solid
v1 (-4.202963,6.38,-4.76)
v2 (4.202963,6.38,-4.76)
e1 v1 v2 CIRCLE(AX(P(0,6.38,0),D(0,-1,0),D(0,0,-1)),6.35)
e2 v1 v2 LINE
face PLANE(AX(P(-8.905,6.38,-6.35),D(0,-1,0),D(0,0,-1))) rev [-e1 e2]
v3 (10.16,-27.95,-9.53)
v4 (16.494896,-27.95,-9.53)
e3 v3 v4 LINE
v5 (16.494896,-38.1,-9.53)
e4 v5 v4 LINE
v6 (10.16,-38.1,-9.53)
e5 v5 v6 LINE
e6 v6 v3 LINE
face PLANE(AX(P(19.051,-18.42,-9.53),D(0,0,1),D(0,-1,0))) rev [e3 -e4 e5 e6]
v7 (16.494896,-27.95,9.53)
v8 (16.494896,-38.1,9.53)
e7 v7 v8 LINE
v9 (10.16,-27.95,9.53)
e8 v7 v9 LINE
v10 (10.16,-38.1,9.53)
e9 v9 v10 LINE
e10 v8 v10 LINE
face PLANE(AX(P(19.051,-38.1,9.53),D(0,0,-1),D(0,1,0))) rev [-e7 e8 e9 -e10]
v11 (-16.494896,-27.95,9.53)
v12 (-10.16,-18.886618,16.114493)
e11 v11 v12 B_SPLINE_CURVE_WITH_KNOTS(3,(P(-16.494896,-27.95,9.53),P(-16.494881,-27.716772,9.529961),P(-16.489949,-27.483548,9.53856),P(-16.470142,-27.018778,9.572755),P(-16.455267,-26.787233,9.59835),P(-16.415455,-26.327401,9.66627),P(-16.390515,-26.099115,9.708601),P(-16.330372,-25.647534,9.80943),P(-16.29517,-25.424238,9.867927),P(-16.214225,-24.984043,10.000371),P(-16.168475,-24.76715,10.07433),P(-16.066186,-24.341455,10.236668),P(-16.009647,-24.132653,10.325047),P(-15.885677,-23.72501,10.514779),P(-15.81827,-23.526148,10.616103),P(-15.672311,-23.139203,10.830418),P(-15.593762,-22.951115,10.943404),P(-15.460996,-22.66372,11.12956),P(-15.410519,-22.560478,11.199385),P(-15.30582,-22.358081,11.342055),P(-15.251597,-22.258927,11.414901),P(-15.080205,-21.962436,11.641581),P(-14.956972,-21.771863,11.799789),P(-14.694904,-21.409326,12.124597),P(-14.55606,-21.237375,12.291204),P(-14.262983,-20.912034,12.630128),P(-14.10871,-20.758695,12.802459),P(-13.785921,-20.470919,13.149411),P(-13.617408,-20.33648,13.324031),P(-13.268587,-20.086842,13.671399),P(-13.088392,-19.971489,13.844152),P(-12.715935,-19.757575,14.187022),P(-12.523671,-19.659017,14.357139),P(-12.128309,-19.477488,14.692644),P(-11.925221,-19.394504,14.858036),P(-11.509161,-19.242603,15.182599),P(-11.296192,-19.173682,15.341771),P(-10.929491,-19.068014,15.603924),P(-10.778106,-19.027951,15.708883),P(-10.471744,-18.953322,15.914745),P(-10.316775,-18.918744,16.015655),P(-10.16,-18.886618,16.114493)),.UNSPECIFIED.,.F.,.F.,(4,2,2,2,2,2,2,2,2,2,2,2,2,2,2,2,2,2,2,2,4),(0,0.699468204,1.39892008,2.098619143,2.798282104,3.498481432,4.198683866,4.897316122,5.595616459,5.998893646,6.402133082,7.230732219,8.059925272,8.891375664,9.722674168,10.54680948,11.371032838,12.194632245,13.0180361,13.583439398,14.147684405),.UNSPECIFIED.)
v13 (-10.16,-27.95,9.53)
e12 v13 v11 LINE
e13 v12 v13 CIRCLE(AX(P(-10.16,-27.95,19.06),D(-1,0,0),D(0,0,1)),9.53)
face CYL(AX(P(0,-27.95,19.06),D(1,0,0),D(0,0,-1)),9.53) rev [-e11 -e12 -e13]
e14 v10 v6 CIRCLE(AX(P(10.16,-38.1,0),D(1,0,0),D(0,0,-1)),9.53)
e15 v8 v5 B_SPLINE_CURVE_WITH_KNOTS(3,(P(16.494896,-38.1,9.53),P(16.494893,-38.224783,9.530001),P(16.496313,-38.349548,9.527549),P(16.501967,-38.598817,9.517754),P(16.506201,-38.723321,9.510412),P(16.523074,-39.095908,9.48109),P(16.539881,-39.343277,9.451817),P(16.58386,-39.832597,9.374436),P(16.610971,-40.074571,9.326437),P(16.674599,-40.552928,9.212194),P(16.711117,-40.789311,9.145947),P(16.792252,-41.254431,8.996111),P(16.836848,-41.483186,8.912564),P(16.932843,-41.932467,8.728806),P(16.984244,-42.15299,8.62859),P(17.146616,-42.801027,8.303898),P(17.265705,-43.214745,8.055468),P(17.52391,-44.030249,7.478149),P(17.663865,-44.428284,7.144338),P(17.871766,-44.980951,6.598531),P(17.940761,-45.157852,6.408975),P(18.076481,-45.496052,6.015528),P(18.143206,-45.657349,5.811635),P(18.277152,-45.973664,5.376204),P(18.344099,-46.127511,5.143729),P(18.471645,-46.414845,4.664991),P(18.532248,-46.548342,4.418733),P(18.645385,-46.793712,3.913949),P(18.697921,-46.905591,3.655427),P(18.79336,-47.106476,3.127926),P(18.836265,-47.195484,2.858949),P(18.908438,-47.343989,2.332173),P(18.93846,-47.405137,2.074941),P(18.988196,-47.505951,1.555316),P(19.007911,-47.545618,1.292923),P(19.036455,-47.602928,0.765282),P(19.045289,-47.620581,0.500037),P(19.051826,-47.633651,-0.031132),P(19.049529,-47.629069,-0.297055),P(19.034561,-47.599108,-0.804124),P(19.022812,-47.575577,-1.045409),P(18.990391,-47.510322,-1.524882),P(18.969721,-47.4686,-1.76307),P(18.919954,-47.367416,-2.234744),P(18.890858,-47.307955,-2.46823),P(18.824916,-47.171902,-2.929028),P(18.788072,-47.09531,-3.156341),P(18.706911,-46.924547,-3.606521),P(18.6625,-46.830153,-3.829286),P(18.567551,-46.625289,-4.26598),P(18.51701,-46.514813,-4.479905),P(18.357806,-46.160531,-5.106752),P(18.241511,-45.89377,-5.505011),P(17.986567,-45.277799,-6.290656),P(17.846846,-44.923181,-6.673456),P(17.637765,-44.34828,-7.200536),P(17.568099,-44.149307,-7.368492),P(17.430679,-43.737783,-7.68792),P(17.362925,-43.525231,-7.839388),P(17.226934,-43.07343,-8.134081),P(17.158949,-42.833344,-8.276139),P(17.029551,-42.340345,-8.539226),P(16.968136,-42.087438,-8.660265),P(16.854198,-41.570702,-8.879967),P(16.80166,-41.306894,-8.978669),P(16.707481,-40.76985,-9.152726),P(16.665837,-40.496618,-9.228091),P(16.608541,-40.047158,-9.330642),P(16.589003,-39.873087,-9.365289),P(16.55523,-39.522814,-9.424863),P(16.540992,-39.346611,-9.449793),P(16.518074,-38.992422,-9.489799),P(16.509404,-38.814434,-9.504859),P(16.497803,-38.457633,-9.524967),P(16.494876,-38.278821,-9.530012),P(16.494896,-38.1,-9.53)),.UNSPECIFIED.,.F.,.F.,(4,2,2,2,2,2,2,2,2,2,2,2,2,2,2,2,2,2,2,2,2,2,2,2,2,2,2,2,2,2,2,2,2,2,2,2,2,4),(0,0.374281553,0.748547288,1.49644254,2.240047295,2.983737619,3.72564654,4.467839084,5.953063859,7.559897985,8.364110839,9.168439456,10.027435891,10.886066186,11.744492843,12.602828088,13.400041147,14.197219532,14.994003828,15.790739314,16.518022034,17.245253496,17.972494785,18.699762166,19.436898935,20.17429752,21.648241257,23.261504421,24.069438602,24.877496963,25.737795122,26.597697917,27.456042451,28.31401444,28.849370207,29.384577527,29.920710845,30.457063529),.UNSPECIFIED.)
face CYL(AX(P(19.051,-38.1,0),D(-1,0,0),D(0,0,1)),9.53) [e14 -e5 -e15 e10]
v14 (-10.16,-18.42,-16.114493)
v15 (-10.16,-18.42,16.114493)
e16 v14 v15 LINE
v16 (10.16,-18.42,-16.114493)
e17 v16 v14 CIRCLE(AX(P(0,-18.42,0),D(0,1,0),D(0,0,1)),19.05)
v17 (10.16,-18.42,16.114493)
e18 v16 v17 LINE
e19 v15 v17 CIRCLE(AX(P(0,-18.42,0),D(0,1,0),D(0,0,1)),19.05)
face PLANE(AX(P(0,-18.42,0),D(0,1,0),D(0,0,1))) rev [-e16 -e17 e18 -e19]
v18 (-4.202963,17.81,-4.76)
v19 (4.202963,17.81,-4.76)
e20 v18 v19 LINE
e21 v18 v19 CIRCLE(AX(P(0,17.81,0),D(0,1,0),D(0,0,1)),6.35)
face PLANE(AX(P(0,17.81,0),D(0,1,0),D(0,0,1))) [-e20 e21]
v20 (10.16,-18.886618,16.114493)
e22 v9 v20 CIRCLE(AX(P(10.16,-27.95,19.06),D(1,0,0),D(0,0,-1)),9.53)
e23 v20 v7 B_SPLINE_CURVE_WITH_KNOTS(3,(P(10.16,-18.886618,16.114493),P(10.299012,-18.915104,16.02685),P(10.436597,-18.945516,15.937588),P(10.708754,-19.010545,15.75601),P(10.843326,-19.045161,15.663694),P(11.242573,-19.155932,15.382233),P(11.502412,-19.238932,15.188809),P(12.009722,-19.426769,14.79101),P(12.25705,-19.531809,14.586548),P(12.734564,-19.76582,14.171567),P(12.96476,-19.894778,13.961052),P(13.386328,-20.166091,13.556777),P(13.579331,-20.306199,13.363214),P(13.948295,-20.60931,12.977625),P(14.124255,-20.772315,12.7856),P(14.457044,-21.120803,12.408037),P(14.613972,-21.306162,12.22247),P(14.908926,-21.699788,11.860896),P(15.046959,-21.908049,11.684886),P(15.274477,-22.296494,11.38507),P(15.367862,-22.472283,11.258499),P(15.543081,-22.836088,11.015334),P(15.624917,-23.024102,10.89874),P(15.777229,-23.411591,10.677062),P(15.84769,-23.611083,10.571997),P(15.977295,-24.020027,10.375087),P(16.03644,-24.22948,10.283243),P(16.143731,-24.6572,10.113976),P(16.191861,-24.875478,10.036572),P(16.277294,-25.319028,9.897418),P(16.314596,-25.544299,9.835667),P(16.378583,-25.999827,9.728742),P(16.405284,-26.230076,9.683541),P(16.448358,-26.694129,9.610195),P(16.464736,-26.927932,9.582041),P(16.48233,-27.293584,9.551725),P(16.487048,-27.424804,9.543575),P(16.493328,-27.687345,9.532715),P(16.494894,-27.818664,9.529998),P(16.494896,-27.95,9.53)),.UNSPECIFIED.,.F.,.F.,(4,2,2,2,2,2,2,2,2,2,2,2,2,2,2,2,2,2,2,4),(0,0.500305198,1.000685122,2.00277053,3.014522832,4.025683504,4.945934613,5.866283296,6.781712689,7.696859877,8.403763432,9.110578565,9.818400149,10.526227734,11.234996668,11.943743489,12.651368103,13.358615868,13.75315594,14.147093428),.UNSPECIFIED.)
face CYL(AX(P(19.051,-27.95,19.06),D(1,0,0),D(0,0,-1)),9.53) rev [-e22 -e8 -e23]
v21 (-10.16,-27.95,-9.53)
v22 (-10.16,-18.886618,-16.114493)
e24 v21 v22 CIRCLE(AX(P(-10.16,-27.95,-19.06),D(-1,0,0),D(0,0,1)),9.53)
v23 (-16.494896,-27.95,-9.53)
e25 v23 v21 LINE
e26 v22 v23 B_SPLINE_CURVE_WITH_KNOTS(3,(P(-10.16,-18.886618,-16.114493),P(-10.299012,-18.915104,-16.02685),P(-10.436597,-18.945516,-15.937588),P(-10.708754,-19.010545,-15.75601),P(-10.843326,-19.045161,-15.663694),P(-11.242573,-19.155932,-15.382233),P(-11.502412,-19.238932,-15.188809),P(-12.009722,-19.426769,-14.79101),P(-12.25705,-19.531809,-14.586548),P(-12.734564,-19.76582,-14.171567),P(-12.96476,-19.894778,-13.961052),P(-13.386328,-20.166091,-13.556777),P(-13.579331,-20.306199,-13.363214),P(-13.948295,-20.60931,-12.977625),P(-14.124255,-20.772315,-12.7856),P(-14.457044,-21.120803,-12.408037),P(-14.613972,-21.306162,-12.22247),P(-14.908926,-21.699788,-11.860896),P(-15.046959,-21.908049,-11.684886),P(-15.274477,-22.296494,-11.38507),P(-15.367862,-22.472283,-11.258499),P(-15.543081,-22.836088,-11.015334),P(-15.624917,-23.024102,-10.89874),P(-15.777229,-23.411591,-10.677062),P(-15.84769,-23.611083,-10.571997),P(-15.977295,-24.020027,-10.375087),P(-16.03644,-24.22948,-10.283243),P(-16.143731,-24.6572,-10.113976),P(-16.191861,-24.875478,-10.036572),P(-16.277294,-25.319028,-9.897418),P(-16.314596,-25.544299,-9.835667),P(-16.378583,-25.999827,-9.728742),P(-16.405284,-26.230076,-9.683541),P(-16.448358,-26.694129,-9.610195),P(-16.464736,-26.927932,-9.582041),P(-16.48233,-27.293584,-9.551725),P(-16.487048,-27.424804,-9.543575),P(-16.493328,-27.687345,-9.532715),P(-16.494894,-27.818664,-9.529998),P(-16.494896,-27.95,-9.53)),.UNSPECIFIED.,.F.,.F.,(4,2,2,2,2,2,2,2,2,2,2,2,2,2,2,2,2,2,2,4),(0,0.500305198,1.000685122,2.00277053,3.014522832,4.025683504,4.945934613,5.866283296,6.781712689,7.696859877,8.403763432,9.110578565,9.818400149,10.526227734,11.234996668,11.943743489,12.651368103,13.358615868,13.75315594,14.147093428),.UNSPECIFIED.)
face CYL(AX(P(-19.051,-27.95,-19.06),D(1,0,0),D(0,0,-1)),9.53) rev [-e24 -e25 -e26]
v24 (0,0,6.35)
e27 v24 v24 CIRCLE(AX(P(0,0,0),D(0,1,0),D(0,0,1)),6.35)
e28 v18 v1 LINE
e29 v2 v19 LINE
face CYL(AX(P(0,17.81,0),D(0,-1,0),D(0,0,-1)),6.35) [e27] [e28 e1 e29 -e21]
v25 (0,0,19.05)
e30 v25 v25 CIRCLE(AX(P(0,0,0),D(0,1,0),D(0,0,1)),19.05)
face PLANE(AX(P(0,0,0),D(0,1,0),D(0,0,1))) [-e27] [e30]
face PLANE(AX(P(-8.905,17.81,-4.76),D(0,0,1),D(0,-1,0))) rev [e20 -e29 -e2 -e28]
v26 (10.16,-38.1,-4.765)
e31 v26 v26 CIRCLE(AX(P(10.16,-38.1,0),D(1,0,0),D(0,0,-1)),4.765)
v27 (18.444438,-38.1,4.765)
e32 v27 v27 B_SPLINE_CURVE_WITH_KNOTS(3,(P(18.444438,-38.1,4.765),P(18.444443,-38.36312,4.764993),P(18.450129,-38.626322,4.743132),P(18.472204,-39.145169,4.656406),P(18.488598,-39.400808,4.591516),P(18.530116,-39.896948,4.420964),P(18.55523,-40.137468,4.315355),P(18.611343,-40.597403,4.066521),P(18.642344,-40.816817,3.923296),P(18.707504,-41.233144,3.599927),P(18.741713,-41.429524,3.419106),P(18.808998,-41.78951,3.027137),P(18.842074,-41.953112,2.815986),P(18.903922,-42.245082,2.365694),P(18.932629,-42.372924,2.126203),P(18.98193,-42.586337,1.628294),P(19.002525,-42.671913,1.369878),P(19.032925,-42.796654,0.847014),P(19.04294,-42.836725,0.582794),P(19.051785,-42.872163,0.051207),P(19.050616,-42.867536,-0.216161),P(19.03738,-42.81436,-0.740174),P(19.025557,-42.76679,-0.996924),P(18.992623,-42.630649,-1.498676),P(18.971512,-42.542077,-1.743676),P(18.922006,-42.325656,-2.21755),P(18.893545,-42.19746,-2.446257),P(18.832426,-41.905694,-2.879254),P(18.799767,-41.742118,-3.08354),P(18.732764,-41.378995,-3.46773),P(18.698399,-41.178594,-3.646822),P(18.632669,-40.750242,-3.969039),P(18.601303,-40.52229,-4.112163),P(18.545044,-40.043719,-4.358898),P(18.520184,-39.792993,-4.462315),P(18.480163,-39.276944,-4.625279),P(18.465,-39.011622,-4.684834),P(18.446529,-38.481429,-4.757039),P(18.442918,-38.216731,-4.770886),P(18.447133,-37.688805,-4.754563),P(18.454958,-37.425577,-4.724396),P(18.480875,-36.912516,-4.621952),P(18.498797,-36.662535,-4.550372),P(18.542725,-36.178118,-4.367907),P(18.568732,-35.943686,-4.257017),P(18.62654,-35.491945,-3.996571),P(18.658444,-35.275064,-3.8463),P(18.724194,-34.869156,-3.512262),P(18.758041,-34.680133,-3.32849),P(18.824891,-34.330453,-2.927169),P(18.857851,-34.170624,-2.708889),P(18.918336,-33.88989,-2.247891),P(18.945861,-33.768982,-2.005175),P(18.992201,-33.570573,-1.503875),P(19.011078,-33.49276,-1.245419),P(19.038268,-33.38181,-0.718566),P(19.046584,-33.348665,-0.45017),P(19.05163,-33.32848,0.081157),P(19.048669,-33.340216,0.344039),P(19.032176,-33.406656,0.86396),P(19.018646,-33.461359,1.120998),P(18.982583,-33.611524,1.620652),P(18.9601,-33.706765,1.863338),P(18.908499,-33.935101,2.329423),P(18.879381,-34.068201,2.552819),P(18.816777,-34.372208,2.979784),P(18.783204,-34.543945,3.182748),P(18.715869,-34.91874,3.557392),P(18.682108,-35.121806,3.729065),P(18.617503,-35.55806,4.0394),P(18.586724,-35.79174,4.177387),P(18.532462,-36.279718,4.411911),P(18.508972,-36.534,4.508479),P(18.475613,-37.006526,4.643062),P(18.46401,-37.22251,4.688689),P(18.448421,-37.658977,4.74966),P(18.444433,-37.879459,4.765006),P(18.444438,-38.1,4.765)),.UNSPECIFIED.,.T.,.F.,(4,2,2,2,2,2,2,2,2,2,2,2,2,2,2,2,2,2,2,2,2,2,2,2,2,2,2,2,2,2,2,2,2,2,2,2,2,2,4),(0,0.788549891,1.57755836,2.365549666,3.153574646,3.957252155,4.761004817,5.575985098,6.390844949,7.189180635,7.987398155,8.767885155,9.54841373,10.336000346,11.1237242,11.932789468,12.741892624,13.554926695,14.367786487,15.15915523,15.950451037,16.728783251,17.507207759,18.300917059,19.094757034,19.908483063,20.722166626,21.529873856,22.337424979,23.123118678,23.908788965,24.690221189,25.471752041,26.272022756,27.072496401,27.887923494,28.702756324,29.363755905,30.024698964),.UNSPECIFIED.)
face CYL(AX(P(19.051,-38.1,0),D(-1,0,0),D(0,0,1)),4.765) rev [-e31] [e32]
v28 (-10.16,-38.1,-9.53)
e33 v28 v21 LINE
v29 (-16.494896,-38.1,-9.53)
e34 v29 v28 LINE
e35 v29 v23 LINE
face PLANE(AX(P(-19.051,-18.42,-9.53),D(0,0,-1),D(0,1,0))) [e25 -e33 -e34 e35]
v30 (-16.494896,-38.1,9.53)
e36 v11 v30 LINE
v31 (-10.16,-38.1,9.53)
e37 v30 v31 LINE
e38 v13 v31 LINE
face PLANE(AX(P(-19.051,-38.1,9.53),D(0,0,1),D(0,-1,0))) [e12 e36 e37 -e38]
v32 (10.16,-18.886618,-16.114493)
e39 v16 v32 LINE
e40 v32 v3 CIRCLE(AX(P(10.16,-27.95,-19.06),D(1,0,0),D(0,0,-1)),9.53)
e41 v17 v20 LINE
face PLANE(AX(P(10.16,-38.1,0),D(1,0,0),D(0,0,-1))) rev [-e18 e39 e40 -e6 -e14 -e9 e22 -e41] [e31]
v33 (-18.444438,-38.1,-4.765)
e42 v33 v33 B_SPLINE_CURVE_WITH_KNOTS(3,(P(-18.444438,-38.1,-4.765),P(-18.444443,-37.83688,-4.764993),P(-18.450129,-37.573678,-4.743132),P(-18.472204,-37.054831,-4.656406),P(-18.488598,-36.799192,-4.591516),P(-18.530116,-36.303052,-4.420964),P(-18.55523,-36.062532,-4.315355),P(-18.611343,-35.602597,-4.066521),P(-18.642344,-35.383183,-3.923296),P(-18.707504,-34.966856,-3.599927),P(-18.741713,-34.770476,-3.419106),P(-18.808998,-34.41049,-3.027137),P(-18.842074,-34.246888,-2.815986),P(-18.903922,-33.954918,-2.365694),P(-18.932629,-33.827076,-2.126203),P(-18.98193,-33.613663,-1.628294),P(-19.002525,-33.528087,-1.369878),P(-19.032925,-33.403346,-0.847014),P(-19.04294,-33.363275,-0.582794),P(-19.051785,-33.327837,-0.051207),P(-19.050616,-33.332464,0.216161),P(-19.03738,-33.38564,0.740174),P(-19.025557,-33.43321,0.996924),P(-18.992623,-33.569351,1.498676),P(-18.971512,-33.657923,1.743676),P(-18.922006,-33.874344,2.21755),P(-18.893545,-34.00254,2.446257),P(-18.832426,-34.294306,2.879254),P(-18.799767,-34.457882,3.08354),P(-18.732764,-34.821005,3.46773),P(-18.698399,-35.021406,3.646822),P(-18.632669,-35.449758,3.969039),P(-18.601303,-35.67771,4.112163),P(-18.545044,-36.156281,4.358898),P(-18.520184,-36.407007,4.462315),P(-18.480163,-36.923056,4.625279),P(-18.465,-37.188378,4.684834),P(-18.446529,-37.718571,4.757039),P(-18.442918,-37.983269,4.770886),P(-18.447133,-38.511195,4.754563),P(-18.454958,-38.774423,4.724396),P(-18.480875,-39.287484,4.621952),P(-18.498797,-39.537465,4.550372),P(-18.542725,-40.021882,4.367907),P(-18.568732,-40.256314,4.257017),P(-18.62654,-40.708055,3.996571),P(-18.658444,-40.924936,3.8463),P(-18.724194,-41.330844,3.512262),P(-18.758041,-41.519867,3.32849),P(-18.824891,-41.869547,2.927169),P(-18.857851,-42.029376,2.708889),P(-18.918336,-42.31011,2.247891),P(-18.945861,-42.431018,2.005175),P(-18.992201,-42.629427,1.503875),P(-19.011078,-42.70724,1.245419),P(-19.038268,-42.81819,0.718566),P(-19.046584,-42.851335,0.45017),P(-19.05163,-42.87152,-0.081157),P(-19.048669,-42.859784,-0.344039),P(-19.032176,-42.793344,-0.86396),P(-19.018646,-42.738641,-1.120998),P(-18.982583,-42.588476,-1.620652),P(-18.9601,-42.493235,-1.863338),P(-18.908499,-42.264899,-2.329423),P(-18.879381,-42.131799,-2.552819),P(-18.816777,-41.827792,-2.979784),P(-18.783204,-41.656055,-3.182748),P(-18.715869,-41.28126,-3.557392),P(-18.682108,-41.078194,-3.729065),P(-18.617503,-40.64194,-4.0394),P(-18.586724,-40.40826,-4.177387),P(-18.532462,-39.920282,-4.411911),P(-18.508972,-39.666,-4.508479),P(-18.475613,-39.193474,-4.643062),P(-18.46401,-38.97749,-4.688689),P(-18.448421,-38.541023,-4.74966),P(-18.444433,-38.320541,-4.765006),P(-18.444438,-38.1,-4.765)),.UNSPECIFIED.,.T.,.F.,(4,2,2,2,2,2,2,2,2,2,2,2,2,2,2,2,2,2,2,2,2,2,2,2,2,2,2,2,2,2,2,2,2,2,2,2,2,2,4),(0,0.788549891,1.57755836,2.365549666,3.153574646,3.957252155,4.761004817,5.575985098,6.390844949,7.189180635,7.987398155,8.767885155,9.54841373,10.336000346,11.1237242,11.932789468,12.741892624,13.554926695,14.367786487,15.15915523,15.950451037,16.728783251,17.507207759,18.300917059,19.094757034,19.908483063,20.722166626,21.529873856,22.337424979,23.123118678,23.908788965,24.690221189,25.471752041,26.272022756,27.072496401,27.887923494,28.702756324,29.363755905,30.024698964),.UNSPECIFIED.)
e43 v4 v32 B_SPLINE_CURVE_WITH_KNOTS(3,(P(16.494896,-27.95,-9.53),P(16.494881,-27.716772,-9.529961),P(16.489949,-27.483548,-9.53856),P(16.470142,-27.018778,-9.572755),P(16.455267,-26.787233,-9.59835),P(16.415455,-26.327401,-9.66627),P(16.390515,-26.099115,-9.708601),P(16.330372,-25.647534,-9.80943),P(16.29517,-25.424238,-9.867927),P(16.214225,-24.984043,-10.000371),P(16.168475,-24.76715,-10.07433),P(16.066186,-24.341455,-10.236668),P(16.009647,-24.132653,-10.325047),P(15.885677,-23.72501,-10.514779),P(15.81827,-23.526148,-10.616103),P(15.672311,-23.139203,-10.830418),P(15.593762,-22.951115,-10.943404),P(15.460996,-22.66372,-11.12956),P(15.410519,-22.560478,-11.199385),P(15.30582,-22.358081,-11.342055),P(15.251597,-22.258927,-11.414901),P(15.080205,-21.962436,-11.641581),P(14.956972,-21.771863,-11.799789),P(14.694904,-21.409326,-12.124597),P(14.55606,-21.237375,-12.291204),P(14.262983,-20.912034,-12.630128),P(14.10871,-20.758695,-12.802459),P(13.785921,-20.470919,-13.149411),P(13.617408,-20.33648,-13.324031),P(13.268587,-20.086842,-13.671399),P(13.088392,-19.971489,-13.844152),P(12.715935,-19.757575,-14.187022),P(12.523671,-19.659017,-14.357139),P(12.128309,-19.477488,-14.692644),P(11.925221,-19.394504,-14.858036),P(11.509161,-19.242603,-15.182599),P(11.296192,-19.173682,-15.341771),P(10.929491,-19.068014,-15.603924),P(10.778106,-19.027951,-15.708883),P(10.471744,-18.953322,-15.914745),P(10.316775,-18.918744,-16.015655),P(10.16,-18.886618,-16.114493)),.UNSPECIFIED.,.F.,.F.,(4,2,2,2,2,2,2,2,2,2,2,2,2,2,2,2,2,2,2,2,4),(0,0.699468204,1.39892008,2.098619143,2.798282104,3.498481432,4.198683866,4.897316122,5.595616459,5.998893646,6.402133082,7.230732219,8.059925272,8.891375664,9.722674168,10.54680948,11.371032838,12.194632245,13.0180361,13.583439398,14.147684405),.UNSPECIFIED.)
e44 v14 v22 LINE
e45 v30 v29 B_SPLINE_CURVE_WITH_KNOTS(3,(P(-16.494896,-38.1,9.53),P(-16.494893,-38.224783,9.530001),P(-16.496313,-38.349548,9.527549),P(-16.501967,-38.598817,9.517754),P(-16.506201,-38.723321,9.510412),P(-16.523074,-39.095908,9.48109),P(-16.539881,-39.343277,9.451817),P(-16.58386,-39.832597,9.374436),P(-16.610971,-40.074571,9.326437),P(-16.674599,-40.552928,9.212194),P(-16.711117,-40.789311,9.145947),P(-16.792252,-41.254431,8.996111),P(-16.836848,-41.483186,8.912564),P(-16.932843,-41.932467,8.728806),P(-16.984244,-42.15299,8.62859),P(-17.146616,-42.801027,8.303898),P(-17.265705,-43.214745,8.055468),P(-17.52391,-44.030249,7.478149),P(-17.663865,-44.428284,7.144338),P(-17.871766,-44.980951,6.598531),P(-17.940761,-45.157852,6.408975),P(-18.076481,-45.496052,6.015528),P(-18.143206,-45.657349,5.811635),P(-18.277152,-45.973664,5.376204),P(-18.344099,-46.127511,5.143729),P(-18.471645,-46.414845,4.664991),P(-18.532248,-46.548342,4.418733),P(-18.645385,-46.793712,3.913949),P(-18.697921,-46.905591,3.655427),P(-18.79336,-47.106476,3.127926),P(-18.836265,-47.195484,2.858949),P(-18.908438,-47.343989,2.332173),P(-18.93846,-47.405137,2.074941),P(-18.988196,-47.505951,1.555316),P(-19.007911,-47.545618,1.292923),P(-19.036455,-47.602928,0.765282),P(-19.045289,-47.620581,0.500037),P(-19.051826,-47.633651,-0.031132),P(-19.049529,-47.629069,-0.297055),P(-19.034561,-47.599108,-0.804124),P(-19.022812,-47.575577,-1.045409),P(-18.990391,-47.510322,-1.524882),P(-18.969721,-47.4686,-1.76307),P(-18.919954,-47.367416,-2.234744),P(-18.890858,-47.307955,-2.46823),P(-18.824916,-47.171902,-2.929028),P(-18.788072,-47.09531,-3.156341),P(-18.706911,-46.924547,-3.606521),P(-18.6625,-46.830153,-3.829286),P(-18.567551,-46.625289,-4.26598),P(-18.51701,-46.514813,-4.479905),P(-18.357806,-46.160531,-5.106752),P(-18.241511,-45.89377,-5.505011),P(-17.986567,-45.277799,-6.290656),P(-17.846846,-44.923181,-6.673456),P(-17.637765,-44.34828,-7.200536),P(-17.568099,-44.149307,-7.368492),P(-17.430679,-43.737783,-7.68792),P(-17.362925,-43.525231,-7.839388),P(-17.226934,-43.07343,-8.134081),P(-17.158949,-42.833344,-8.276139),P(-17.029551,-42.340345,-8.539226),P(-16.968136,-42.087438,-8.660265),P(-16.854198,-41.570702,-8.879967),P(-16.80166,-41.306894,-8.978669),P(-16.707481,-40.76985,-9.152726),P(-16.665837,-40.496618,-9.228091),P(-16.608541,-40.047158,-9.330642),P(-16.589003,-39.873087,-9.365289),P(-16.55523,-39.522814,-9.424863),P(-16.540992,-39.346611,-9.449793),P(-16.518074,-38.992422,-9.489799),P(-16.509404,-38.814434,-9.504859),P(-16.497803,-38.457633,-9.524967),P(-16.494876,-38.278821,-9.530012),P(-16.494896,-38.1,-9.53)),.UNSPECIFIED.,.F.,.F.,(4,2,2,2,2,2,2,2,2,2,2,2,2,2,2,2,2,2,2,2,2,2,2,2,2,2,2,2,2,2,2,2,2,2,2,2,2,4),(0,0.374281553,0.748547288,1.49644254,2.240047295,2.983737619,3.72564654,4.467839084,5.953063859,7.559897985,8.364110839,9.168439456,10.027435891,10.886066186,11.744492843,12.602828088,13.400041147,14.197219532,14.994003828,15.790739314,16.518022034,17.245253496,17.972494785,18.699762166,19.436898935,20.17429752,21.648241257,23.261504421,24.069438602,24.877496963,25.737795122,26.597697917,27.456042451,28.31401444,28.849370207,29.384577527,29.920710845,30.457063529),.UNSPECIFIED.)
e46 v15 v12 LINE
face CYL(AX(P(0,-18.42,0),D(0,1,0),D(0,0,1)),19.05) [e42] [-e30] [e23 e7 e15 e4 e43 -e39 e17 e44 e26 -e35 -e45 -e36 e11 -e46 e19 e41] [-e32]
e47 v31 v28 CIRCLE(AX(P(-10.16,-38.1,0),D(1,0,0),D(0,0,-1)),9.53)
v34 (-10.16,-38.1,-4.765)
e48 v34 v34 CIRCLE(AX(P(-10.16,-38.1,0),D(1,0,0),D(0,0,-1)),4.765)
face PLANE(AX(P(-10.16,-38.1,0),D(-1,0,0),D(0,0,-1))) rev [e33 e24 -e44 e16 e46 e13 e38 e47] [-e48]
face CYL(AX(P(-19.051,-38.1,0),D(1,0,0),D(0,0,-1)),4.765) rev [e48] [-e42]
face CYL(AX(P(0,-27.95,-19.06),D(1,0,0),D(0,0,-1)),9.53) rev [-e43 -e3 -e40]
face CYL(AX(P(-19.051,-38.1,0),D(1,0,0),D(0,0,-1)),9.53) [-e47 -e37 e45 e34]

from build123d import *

# Parameters (mm, degrees)
IZIM2_R                          = 19.05
Y_KSEKLIK_EKSTR_ZYON2_DEPTH      = 18.42
Y_KSEKLIK_EKSTR_ZYON4_REACH      = 41.439
Y_KSEKLIK_EKSTR_ZYON4_END_RADIUS = 19.05
IZIM3_R                          = 4.765
RADYUS1_R                        = 9.53
IZIM5_R                          = 6.35
Y_KSEKLIK_EKSTR_ZYON5_DEPTH      = 17.81
IZIM6_W                          = 1.59
IZIM6_H                          = 11.43
KES_EKSTR_ZYON2_DEPTH            = 8.905


with BuildPart() as part:
    # Çizim2 → Yükseklik-Ekstrüzyon2 (new body)
    with BuildSketch(Plane(origin=(0, 0, 0), x_dir=(1, 0, 0), z_dir=(0, 1, 0))):
        with Locations(Location((0, 0, 0), (0, 0, 270))):
            Circle(IZIM2_R)
    extrude(amount=-Y_KSEKLIK_EKSTR_ZYON2_DEPTH)

    # Yükseklik-Ekstrüzyon4: up to this cylinder (the profile starts inside it)
    y_kseklik_ekstr_zyon4_end = Plane(origin=(0, -31.124737, 0), z_dir=(0, 1, 0)) * Cylinder(Y_KSEKLIK_EKSTR_ZYON4_END_RADIUS, 121.978, mode=Mode.PRIVATE)
    # Çizim3 → Yükseklik-Ekstrüzyon4 (add, up to the surface)
    with BuildSketch(Plane(origin=(10.16, 0, 0), x_dir=(0, 0, -1), z_dir=(1, 0, 0)), mode=Mode.PRIVATE) as y_kseklik_ekstr_zyon4_sk1:
        with BuildLine():
            Line((-9.53, -38.1), (-9.53, -18.42))
            Line((-9.53, -18.42), (9.53, -18.42))
            Line((9.53, -18.42), (9.53, -38.1))
            ThreePointArc((9.53, -38.1), (0, -47.63), (-9.53, -38.1))
        make_face()
        with Locations(Location((0, -38.1, 0), (0, 0, 180))):
            Circle(IZIM3_R, mode=Mode.SUBTRACT)
    y_kseklik_ekstr_zyon4_tool1 = extrude(y_kseklik_ekstr_zyon4_sk1.sketch, amount=Y_KSEKLIK_EKSTR_ZYON4_REACH, mode=Mode.PRIVATE) & y_kseklik_ekstr_zyon4_end
    y_kseklik_ekstr_zyon4 = y_kseklik_ekstr_zyon4_tool1.solids().sort_by_distance((10.16, -31.124737, 0))[0]
    add(y_kseklik_ekstr_zyon4)

    # Aynalama3: Yükseklik-Ekstrüzyon4 across plane
    add(y_kseklik_ekstr_zyon4.mirror(Plane(origin=(0, 0, 0), x_dir=(0, 0, 1), z_dir=(1, 0, 0))))

    # Radyus1
    # the kernel refuses this fillet: 9.53 mm, written as the material it adds along each edge
    with BuildSketch(Plane(origin=(13.665, -18.42, 9.53), x_dir=(0, 0, 1), z_dir=(-1, 0, 0))) as radyus1_piece_1_section:
        with BuildLine():
            CenterArc((RADYUS1_R, -RADYUS1_R), RADYUS1_R, 90, 90)
            Line((0, -RADYUS1_R), (0, 0))
            Line((0, 0), (RADYUS1_R, 0))
        make_face()
    radyus1_piece_1 = extrude(amount=53.98489618, mode=Mode.PRIVATE)
    radyus1_piece_1 = radyus1_piece_1 & Plane(origin=(0, -20.798311962, 0), x_dir=(0, 0, 1), z_dir=(0, 1, 0)) * Cylinder(19.05, 147, mode=Mode.PRIVATE)
    radyus1_piece_1 = split(radyus1_piece_1, bisect_by=Plane(origin=(10.16, -20.798311962, 11.199892809), z_dir=(1, 0, 0)), keep=Keep.TOP, mode=Mode.PRIVATE)
    add(radyus1_piece_1)
    with BuildSketch(Plane(origin=(-10.16, -18.42, 9.53), x_dir=(0, 0, 1), z_dir=(-1, 0, 0))) as radyus1_piece_2_section:
        with BuildLine():
            CenterArc((RADYUS1_R, -RADYUS1_R), RADYUS1_R, 90, 90)
            Line((0, -RADYUS1_R), (0, 0))
            Line((0, 0), (RADYUS1_R, 0))
        make_face()
    radyus1_piece_2 = extrude(amount=30.15989618, mode=Mode.PRIVATE)
    radyus1_piece_2 = radyus1_piece_2 & Plane(origin=(0, -21.011864307, 0), x_dir=(0, 0, 1), z_dir=(0, 1, 0)) * Cylinder(19.05, 99, mode=Mode.PRIVATE)
    add(radyus1_piece_2)
    with BuildSketch(Plane(origin=(13.665, -18.42, -9.53), x_dir=(0, 0, -1), z_dir=(-1, 0, 0))) as radyus1_piece_3_section:
        with BuildLine():
            CenterArc((RADYUS1_R, RADYUS1_R), RADYUS1_R, 180, 90)
            Line((0, RADYUS1_R), (0, 0))
            Line((0, 0), (RADYUS1_R, 0))
        make_face()
    radyus1_piece_3 = extrude(amount=53.98489618, mode=Mode.PRIVATE)
    radyus1_piece_3 = radyus1_piece_3 & Plane(origin=(0, -20.798311941, 0), x_dir=(0, 0, 1), z_dir=(0, 1, 0)) * Cylinder(19.05, 147, mode=Mode.PRIVATE)
    radyus1_piece_3 = split(radyus1_piece_3, bisect_by=Plane(origin=(10.16, -20.798311941, -11.199892873), z_dir=(1, 0, 0)), keep=Keep.TOP, mode=Mode.PRIVATE)
    add(radyus1_piece_3)
    with BuildSketch(Plane(origin=(-10.16, -18.42, -9.53), x_dir=(0, 0, -1), z_dir=(-1, 0, 0))) as radyus1_piece_4_section:
        with BuildLine():
            CenterArc((RADYUS1_R, RADYUS1_R), RADYUS1_R, 180, 90)
            Line((0, RADYUS1_R), (0, 0))
            Line((0, 0), (RADYUS1_R, 0))
        make_face()
    radyus1_piece_4 = extrude(amount=30.15989618, mode=Mode.PRIVATE)
    radyus1_piece_4 = radyus1_piece_4 & Plane(origin=(0, -21.011867626, 0), x_dir=(0, 0, 1), z_dir=(0, 1, 0)) * Cylinder(19.05, 99, mode=Mode.PRIVATE)
    add(radyus1_piece_4)
    with BuildSketch(Plane(origin=(-13.665, -18.42, 9.53), x_dir=(0, 0, 1), z_dir=(1, 0, 0))) as radyus1_piece_5_section:
        with BuildLine():
            CenterArc((RADYUS1_R, RADYUS1_R), RADYUS1_R, 180, 90)
            Line((0, RADYUS1_R), (0, 0))
            Line((0, 0), (RADYUS1_R, 0))
        make_face()
    radyus1_piece_5 = extrude(amount=53.98489618, mode=Mode.PRIVATE)
    radyus1_piece_5 = radyus1_piece_5 & Plane(origin=(0, -20.798312003, 0), x_dir=(0, 0, 1), z_dir=(0, 1, 0)) * Cylinder(19.05, 147, mode=Mode.PRIVATE)
    radyus1_piece_5 = split(radyus1_piece_5, bisect_by=Plane(origin=(-10.16, -20.798312003, 11.199892685), z_dir=(-1, 0, 0)), keep=Keep.TOP, mode=Mode.PRIVATE)
    add(radyus1_piece_5)
    with BuildSketch(Plane(origin=(10.16, -18.42, 9.53), x_dir=(0, 0, 1), z_dir=(1, 0, 0))) as radyus1_piece_6_section:
        with BuildLine():
            CenterArc((RADYUS1_R, RADYUS1_R), RADYUS1_R, 180, 90)
            Line((0, RADYUS1_R), (0, 0))
            Line((0, 0), (RADYUS1_R, 0))
        make_face()
    radyus1_piece_6 = extrude(amount=30.15989618, mode=Mode.PRIVATE)
    radyus1_piece_6 = radyus1_piece_6 & Plane(origin=(0, -21.011867621, 0), x_dir=(0, 0, 1), z_dir=(0, 1, 0)) * Cylinder(19.05, 99, mode=Mode.PRIVATE)
    add(radyus1_piece_6)
    with BuildSketch(Plane(origin=(-13.665, -18.42, -9.53), x_dir=(0, 0, -1), z_dir=(1, 0, 0))) as radyus1_piece_7_section:
        with BuildLine():
            CenterArc((RADYUS1_R, -RADYUS1_R), RADYUS1_R, 90, 90)
            Line((0, -RADYUS1_R), (0, 0))
            Line((0, 0), (RADYUS1_R, 0))
        make_face()
    radyus1_piece_7 = extrude(amount=53.98489618, mode=Mode.PRIVATE)
    radyus1_piece_7 = radyus1_piece_7 & Plane(origin=(0, -20.798311958, 0), x_dir=(0, 0, 1), z_dir=(0, 1, 0)) * Cylinder(19.05, 147, mode=Mode.PRIVATE)
    radyus1_piece_7 = split(radyus1_piece_7, bisect_by=Plane(origin=(-10.16, -20.798311958, -11.199892821), z_dir=(-1, 0, 0)), keep=Keep.TOP, mode=Mode.PRIVATE)
    add(radyus1_piece_7)
    with BuildSketch(Plane(origin=(10.16, -18.42, -9.53), x_dir=(0, 0, -1), z_dir=(1, 0, 0))) as radyus1_piece_8_section:
        with BuildLine():
            CenterArc((RADYUS1_R, -RADYUS1_R), RADYUS1_R, 90, 90)
            Line((0, -RADYUS1_R), (0, 0))
            Line((0, 0), (RADYUS1_R, 0))
        make_face()
    radyus1_piece_8 = extrude(amount=30.15989618, mode=Mode.PRIVATE)
    radyus1_piece_8 = radyus1_piece_8 & Plane(origin=(0, -21.011864338, 0), x_dir=(0, 0, 1), z_dir=(0, 1, 0)) * Cylinder(19.05, 99, mode=Mode.PRIVATE)
    add(radyus1_piece_8)

    # Çizim5 → Yükseklik-Ekstrüzyon5 (add)
    with BuildSketch(Plane(origin=(0, 0, 0), x_dir=(1, 0, 0), z_dir=(0, 1, 0))):
        with Locations(Location((0, 0, 0), (0, 0, 90))):
            Circle(IZIM5_R)
    extrude(amount=Y_KSEKLIK_EKSTR_ZYON5_DEPTH)

    # Çizim6 → Kes-Ekstrüzyon2 (cut, symmetric)
    with BuildSketch(Plane(origin=(0, 0, 0), x_dir=(0, 0, -1), z_dir=(1, 0, 0))):
        with Locations((5.555, 12.095)):
            Rectangle(IZIM6_W, IZIM6_H)
    extrude(amount=KES_EKSTR_ZYON2_DEPTH, both=True, mode=Mode.SUBTRACT)


solid = part.part
